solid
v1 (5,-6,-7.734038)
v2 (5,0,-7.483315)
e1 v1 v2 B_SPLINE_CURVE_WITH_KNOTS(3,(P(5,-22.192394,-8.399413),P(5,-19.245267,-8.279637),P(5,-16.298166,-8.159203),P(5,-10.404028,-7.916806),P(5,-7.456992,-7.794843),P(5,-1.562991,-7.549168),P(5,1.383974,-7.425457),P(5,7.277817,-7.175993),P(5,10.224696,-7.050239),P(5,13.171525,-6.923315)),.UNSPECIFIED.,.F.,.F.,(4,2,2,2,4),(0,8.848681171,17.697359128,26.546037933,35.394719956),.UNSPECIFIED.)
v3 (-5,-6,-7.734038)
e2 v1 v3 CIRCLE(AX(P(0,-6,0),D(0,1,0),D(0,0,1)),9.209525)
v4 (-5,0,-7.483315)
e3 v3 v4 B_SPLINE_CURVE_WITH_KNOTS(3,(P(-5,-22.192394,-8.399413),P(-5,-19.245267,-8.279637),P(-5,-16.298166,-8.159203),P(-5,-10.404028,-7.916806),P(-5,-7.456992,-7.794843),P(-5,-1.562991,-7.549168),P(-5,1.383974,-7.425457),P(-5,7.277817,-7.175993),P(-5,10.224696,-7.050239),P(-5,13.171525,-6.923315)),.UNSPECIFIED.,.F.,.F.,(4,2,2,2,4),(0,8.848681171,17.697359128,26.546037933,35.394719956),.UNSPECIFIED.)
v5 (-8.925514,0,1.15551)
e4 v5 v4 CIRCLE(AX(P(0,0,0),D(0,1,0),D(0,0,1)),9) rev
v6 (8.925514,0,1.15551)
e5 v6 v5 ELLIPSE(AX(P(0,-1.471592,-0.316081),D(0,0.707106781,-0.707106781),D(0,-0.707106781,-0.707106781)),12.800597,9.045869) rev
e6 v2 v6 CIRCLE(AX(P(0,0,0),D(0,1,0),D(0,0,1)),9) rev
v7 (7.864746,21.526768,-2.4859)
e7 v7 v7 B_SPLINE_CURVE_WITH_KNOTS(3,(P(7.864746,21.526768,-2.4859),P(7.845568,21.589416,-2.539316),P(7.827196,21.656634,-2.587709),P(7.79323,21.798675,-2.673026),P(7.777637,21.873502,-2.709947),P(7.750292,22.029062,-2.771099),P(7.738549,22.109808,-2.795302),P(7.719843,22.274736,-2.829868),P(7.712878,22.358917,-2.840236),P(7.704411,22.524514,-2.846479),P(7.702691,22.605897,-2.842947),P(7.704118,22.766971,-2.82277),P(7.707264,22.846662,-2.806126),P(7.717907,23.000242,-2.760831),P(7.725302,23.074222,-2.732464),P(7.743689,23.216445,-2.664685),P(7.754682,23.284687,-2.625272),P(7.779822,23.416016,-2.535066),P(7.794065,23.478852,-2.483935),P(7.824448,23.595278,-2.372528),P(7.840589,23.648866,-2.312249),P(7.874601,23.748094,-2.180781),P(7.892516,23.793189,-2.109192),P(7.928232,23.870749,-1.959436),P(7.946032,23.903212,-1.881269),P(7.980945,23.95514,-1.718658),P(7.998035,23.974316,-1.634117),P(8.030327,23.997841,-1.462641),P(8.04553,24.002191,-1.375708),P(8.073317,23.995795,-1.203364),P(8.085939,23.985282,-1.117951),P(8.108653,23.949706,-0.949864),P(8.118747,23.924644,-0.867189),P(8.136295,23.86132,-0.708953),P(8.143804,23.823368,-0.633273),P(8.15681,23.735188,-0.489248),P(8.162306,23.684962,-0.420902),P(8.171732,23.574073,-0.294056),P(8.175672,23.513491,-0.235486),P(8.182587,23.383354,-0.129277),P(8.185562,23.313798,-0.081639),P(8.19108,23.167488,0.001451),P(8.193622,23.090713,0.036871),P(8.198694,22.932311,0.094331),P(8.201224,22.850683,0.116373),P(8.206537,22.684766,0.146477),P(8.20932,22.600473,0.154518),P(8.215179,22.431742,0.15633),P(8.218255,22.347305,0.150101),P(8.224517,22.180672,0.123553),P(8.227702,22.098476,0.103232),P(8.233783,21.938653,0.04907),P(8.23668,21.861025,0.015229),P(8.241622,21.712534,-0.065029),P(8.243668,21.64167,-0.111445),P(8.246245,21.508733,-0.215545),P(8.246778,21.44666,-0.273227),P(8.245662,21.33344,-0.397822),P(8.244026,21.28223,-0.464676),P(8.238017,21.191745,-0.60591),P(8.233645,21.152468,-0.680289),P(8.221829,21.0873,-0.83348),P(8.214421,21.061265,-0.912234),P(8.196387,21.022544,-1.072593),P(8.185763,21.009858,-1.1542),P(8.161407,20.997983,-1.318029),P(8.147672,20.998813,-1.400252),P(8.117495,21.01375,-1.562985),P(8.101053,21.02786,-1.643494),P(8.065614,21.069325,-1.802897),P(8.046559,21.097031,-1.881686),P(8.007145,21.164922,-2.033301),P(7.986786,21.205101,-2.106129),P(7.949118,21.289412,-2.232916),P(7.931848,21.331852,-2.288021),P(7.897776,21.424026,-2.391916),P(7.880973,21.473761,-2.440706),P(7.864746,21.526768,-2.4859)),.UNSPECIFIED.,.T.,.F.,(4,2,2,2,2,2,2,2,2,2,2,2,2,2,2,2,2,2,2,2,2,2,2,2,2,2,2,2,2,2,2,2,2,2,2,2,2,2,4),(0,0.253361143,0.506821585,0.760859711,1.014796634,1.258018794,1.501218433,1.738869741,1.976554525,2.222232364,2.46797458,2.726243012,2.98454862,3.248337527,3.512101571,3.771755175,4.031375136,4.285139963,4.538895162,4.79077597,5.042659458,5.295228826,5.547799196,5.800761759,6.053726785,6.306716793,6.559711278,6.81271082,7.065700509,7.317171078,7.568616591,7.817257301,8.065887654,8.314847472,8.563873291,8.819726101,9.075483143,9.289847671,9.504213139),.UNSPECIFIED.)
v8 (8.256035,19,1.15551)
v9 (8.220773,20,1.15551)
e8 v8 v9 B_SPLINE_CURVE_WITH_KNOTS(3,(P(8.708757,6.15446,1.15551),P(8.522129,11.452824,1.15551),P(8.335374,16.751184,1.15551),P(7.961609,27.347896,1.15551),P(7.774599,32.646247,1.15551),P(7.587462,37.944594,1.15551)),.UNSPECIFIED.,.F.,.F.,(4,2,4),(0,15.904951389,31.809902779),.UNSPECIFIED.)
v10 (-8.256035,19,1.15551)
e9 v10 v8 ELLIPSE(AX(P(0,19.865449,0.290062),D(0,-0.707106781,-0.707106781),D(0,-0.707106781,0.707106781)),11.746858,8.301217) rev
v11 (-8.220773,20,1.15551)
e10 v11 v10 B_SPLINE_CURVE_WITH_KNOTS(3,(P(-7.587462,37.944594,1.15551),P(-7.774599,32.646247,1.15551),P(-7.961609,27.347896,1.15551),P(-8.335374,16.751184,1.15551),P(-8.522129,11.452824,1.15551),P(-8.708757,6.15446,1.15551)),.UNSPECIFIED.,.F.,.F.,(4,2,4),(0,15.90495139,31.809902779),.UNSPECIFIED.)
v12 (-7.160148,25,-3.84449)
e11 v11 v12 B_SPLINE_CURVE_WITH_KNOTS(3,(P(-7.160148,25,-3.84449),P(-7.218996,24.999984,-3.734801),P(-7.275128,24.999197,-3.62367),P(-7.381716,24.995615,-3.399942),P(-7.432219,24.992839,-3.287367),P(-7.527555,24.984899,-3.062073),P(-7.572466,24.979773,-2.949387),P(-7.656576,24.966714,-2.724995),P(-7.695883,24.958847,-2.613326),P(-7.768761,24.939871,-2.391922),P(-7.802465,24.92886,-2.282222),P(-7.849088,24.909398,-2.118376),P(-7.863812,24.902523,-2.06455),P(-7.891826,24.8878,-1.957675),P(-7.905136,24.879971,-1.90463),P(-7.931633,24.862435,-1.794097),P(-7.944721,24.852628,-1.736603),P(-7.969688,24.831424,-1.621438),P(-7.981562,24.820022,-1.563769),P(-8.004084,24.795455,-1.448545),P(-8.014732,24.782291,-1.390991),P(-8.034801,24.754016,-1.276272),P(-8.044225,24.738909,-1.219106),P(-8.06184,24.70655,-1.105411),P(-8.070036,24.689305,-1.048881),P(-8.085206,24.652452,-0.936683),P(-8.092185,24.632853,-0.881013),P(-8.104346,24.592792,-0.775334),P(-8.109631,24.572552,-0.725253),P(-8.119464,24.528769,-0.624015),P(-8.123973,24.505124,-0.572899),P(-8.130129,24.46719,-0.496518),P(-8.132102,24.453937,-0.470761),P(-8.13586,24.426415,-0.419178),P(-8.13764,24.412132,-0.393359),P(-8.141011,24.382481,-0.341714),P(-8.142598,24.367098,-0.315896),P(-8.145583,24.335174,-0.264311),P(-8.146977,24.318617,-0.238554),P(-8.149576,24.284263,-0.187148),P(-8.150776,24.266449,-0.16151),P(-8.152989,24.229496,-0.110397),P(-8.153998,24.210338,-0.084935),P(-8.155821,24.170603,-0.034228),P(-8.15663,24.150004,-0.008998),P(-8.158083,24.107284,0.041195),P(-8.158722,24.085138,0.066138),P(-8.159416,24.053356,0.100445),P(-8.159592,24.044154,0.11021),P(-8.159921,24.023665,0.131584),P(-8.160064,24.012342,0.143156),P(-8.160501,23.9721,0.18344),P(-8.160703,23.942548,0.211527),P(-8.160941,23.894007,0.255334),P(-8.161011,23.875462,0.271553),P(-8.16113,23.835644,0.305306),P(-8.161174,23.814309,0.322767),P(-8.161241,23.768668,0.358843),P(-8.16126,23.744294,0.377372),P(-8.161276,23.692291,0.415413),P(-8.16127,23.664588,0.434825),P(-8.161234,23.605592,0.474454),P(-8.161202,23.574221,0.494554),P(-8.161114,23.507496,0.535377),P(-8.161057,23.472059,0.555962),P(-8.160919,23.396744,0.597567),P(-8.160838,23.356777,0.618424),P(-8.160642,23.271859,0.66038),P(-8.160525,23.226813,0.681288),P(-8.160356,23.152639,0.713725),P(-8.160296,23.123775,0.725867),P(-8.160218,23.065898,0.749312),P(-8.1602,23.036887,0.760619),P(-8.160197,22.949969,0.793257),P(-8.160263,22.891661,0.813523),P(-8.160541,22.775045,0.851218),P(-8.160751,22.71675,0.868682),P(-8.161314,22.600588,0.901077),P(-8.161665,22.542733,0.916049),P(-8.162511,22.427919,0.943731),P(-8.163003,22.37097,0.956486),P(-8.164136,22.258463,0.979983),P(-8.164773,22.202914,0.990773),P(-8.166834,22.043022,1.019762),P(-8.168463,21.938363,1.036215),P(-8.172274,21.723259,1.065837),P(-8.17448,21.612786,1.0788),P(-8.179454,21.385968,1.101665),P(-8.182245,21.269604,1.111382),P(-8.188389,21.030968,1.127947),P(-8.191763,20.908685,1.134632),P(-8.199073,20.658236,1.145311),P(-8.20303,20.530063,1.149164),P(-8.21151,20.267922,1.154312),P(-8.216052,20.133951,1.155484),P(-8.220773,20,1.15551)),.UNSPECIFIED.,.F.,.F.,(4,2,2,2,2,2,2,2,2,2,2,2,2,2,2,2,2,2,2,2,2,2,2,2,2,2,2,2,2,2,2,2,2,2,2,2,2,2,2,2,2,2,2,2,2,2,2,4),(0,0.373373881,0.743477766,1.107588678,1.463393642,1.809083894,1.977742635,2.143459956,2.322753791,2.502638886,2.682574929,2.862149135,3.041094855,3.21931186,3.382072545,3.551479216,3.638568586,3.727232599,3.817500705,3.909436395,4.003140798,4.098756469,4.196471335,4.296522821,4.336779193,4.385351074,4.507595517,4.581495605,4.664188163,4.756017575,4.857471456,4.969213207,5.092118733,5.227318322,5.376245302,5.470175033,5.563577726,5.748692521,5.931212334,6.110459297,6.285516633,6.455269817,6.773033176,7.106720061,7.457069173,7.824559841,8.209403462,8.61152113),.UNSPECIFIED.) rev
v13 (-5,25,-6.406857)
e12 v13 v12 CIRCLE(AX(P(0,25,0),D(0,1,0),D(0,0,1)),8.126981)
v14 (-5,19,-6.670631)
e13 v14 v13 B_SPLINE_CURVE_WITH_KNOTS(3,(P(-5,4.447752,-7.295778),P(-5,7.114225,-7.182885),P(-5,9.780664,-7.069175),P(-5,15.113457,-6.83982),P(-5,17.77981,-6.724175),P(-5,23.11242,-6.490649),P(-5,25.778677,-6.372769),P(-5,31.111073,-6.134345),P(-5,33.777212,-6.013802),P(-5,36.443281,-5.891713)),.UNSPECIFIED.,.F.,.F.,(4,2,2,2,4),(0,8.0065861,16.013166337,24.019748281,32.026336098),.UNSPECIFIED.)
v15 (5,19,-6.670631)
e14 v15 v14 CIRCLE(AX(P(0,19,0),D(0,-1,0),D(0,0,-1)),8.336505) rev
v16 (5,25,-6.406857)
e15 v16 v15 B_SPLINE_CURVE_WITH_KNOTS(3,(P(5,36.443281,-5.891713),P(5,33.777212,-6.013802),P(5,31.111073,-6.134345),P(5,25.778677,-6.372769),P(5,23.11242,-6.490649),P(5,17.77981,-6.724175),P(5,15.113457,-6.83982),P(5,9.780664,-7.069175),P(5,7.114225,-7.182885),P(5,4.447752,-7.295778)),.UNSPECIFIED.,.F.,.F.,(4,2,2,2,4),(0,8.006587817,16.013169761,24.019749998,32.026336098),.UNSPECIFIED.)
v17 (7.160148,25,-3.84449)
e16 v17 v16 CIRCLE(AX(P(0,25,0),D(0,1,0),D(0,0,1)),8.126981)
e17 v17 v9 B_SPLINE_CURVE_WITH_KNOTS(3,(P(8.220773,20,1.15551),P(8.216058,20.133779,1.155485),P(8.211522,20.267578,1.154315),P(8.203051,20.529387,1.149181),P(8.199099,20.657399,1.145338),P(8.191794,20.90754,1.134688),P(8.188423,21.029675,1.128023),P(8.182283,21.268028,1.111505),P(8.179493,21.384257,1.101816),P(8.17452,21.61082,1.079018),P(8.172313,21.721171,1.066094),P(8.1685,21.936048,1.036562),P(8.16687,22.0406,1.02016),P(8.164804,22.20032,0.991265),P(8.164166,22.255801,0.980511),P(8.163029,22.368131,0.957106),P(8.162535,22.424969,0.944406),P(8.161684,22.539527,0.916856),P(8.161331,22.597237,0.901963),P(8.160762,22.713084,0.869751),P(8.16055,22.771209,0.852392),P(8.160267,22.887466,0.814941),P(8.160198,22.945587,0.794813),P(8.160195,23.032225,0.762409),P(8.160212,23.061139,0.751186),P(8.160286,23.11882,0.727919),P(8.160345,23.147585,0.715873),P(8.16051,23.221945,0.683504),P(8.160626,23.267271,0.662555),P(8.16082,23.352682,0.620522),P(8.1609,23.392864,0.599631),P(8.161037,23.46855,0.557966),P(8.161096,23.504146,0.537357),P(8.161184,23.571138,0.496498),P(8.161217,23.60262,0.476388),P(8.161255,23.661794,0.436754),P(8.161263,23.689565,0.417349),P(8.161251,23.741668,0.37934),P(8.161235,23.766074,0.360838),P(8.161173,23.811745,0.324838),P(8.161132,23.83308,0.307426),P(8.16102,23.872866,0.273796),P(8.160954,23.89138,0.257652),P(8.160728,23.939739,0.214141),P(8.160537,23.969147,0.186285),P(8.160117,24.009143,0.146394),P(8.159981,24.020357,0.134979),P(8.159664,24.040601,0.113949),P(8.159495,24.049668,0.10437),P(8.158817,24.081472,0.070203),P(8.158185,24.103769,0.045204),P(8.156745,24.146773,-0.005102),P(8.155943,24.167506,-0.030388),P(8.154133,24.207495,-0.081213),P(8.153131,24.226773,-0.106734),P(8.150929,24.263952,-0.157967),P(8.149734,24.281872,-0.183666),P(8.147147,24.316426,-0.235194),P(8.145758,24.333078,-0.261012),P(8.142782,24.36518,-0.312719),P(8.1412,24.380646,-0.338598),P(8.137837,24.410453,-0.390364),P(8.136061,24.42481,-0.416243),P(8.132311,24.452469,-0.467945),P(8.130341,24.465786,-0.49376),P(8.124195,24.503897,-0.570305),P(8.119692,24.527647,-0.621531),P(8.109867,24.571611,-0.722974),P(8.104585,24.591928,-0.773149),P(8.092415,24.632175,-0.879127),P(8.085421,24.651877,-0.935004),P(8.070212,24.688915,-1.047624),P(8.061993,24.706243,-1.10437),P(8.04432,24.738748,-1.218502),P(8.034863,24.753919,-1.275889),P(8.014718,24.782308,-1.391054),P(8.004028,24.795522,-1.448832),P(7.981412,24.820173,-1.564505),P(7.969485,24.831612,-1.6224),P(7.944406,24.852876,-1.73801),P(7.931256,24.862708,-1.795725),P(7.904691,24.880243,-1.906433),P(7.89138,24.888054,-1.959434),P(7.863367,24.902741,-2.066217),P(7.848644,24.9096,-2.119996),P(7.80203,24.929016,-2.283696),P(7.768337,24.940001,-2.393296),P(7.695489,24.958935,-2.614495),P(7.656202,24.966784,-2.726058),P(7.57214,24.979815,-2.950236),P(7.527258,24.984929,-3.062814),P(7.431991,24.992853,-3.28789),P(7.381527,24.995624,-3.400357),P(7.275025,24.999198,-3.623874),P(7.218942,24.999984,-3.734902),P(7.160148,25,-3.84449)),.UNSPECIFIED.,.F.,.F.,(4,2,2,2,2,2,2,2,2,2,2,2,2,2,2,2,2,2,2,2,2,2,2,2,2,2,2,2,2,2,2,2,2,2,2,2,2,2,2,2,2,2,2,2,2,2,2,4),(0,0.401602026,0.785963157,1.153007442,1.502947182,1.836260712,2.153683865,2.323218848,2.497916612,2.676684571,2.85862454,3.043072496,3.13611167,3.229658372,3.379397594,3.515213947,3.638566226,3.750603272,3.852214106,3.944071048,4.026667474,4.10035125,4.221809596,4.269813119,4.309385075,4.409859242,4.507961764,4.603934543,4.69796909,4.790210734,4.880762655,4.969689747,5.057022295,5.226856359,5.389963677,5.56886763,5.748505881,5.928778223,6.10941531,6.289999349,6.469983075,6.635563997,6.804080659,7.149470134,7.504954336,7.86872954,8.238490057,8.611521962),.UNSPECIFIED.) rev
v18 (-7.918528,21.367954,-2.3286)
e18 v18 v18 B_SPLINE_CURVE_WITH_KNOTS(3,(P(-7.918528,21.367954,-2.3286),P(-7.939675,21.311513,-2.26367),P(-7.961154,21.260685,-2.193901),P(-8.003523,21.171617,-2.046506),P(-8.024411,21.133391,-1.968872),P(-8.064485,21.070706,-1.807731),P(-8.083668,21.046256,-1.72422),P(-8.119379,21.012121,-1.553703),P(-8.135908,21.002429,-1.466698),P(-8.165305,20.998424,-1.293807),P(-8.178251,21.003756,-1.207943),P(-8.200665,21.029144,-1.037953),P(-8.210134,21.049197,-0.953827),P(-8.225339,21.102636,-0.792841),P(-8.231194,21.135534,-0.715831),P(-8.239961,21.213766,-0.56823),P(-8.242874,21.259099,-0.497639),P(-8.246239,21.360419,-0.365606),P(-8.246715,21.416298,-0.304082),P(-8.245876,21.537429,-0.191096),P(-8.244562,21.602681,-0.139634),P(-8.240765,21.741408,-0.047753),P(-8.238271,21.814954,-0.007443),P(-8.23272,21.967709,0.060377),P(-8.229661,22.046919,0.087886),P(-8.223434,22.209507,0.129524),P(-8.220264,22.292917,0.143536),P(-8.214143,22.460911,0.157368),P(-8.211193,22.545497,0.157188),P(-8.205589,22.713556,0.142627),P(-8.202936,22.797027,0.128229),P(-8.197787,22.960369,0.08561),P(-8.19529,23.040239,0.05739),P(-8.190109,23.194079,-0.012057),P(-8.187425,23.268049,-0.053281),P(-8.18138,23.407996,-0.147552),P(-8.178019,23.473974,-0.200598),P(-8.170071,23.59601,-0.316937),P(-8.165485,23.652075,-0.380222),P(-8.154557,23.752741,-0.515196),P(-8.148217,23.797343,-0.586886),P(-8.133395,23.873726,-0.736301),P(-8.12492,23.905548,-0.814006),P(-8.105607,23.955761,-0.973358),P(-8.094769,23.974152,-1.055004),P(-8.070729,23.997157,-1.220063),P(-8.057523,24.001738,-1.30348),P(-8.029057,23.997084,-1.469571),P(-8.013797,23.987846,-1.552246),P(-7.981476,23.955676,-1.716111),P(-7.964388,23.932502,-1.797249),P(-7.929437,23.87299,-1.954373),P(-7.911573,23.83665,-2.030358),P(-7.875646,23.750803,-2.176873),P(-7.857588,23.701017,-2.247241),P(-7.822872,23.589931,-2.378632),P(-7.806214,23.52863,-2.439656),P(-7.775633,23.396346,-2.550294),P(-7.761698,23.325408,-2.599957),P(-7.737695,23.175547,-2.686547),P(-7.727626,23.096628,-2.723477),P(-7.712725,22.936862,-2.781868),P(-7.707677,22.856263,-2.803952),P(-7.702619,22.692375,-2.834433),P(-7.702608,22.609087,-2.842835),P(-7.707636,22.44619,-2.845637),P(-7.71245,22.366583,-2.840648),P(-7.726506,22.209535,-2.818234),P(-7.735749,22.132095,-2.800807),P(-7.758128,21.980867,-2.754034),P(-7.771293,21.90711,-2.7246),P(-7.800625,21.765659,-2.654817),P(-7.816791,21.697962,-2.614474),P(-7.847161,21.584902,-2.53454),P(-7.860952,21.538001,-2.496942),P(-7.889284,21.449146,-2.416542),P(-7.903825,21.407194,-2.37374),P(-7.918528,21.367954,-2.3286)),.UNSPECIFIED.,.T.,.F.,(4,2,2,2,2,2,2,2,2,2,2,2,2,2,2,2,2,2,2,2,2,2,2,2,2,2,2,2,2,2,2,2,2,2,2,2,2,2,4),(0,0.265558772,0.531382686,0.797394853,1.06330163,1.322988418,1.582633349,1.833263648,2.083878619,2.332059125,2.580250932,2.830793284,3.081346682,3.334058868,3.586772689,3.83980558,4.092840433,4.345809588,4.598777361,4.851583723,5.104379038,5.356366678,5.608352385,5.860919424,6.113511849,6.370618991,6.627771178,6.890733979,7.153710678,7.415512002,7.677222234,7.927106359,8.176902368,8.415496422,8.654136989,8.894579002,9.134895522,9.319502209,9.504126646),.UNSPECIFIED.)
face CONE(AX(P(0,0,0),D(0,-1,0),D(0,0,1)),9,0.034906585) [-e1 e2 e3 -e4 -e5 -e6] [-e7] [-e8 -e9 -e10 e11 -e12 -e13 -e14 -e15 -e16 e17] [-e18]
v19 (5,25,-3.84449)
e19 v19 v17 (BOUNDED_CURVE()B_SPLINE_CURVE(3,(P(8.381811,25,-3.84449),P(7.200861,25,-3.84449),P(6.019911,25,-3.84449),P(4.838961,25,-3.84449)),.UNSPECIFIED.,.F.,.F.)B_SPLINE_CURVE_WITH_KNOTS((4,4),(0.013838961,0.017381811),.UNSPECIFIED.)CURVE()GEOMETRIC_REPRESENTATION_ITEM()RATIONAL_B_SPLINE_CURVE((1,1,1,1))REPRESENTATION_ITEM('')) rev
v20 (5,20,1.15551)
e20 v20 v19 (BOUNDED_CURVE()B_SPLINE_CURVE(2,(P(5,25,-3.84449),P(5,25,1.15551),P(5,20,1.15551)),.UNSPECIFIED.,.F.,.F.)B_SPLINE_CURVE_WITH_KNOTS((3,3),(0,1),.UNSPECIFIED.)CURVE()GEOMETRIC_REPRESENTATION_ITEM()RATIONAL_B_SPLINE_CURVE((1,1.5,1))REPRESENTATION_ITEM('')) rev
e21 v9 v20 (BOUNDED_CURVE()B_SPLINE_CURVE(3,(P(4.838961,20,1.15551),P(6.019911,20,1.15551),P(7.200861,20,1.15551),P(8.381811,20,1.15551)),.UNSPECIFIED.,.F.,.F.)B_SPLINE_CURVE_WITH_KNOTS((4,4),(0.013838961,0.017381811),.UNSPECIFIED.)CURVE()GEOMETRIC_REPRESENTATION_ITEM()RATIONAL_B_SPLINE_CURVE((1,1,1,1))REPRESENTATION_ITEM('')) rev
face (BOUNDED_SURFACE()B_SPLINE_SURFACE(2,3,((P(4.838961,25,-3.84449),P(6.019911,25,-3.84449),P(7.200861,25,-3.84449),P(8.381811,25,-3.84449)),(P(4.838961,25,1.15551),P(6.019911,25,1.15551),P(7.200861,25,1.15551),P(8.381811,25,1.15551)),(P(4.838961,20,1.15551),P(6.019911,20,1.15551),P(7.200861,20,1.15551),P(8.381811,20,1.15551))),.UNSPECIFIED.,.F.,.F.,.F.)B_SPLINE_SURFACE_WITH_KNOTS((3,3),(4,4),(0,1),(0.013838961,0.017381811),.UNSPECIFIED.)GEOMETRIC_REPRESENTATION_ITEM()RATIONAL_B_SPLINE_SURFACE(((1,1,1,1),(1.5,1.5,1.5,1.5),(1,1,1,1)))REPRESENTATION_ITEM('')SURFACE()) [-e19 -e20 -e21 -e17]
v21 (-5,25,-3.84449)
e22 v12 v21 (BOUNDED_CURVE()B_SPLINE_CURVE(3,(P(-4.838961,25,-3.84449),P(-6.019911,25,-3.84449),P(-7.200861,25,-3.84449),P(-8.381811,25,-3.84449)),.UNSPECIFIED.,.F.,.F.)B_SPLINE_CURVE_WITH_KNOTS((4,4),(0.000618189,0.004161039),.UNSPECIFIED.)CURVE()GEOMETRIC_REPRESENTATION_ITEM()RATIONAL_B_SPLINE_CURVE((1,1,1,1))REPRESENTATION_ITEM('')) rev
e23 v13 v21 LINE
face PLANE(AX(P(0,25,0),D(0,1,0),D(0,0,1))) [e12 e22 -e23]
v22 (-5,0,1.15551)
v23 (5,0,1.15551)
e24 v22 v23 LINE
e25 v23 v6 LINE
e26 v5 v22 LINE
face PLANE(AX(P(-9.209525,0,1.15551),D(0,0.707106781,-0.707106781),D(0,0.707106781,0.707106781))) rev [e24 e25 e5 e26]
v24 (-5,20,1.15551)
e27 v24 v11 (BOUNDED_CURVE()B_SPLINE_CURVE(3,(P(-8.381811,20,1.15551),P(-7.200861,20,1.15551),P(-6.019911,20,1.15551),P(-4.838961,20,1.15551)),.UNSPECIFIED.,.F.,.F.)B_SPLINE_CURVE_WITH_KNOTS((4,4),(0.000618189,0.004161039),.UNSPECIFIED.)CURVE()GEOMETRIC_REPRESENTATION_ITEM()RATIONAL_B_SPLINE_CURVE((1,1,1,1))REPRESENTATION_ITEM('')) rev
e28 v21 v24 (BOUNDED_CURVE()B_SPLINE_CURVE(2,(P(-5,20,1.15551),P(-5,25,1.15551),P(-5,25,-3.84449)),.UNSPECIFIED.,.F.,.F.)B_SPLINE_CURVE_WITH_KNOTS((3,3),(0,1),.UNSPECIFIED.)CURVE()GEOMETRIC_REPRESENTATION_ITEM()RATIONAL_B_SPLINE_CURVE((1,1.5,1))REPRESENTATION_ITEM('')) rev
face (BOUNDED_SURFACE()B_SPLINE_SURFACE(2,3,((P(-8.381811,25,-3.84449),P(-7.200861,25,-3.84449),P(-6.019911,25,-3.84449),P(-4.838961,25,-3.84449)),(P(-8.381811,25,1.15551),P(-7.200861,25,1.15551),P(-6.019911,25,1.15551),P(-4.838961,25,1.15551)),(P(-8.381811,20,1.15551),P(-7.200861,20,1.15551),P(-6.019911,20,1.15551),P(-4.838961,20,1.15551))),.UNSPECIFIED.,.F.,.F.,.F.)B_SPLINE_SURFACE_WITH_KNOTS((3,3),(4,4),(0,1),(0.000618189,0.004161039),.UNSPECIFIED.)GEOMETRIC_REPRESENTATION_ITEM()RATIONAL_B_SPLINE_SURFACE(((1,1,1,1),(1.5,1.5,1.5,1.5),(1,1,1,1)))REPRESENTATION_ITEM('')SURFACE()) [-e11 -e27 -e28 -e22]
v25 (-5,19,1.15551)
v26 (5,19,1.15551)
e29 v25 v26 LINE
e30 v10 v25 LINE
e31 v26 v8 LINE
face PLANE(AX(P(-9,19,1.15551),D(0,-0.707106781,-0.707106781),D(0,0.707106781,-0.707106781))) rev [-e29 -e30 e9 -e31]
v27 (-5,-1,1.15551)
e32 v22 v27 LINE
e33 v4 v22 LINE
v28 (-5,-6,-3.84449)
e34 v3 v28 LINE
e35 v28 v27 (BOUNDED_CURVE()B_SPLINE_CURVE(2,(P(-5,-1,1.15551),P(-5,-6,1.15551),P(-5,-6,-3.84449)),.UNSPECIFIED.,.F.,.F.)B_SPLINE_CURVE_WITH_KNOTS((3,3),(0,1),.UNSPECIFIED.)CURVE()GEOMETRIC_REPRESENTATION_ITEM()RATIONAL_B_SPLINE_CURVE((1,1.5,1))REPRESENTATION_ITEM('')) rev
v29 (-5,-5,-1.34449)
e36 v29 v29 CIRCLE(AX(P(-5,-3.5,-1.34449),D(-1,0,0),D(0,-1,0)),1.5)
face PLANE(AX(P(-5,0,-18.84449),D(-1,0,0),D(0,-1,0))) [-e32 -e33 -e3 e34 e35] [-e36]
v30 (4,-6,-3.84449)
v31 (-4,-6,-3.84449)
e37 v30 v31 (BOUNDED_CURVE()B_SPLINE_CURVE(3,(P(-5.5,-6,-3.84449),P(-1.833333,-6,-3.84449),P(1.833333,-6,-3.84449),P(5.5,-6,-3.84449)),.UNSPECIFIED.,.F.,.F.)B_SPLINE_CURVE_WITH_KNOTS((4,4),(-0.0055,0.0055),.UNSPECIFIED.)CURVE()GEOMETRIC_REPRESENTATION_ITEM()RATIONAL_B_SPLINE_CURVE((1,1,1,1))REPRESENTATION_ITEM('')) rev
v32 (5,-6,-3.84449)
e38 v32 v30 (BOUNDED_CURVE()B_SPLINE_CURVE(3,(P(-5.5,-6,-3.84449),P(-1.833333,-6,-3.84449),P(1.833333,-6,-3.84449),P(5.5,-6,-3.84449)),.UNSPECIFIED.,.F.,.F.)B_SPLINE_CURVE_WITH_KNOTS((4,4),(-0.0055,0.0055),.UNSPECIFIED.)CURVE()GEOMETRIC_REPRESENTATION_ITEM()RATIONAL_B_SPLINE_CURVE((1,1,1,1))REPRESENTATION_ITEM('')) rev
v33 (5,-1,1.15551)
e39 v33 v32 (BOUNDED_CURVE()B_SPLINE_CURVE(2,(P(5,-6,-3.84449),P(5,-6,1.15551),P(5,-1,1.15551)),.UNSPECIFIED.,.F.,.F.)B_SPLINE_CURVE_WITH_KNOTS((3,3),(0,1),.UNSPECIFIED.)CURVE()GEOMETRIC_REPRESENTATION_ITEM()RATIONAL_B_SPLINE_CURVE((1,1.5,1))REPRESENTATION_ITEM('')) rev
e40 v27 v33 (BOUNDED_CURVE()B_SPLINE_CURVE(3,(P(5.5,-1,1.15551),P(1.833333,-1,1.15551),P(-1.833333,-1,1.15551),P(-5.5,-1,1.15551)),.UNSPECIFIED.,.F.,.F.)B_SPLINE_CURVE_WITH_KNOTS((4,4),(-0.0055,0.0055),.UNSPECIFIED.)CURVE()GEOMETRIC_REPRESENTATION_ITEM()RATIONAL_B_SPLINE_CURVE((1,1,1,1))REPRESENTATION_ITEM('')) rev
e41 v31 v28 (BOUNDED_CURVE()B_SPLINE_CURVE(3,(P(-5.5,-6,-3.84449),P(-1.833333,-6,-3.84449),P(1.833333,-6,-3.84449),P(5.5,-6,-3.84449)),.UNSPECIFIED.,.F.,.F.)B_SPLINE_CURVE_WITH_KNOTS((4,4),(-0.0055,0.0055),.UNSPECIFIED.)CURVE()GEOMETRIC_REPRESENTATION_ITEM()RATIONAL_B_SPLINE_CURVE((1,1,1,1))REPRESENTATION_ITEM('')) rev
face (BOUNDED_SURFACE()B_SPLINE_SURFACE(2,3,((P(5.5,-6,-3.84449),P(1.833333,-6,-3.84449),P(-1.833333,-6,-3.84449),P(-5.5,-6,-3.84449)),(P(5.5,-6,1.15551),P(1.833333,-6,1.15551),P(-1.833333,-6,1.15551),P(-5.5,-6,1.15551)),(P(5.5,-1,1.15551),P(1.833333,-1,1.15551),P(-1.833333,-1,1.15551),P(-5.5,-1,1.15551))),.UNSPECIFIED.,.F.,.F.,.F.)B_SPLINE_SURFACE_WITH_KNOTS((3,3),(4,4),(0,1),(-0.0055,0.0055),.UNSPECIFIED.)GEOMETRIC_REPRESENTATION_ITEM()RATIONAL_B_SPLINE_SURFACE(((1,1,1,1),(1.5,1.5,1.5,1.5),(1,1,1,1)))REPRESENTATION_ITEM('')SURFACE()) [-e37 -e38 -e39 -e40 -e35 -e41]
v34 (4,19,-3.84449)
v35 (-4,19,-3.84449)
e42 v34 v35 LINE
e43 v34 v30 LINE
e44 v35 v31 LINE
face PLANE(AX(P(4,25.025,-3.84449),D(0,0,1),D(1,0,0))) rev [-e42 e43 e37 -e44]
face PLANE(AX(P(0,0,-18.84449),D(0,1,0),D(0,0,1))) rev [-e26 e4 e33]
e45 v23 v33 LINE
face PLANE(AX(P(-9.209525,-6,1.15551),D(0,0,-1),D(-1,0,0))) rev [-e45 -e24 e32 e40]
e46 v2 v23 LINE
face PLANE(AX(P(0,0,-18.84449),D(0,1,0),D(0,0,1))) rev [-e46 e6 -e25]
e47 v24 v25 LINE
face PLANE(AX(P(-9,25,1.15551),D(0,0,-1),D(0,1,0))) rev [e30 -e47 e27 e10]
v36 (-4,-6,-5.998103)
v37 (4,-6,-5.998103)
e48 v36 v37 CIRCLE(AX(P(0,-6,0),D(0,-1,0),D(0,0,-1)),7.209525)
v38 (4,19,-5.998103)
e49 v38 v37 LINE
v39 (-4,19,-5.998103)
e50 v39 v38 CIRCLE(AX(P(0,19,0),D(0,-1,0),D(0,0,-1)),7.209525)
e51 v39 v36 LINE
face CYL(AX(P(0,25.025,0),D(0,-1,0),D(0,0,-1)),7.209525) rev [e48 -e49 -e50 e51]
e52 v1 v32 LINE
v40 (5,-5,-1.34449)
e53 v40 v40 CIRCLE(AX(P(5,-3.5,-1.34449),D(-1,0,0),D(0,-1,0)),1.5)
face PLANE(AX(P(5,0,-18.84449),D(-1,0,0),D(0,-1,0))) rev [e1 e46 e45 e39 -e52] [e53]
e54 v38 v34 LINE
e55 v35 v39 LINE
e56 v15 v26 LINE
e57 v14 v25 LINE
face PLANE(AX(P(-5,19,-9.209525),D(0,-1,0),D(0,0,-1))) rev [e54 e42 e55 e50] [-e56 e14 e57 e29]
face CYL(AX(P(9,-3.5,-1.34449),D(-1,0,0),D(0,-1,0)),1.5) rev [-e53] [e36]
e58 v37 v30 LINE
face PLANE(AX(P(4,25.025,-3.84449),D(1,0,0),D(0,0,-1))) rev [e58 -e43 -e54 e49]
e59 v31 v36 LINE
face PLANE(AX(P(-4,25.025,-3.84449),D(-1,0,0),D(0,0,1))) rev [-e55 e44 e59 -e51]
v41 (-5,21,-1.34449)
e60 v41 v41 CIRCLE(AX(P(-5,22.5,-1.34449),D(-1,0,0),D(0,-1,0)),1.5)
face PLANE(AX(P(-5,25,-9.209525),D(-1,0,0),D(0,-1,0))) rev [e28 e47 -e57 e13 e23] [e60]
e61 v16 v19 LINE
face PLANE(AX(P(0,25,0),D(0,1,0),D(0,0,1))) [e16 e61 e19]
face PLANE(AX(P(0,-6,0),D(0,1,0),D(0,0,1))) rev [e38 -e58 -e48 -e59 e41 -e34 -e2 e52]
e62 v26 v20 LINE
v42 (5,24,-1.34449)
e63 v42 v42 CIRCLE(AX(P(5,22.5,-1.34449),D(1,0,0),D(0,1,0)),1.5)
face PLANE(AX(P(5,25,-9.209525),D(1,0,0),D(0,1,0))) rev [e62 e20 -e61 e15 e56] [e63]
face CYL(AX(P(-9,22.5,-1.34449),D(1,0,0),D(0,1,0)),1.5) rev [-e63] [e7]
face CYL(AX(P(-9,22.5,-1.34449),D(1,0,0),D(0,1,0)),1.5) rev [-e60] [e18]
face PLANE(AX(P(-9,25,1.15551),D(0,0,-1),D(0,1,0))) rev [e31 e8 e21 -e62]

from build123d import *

# Parameters (mm, degrees)
SKETCH1_R                     = 9
BOSS_EXTRUDE1_DEPTH           = 25
BOSS_EXTRUDE1_TAPER           = 2
BOSS_EXTRUDE1_OTHER_WAY_DEPTH = 6
BOSS_EXTRUDE1_OTHER_WAY_TAPER = -2
CUT_EXTRUDE1_DEPTH            = 29.189194514
CUT_EXTRUDE1_DEPTH_BACK       = 29.189194514
CUT_EXTRUDE2_START            = -10.365035118
CUT_EXTRUDE2_OUTLINE_W        = 9.770566763
CUT_EXTRUDE2_OUTLINE_H        = 6
CUT_EXTRUDE2_DEPTH            = 10.365035118
CUT_EXTRUDE3_DEPTH            = 31.096766332
CUT_EXTRUDE3_DEPTH_BACK       = 31.096766332
SKETCH5_R                     = 1.5
FILLET1_SIZE                  = 5
CUT_EXTRUDE4_DEPTH            = 29.121439218
CUT_EXTRUDE4_DEPTH_BACK       = 29.121439218
SKETCH8_W                     = 10
SKETCH8_H                     = 6
CUT_EXTRUDE5_DEPTH            = 29.520763505
CUT_EXTRUDE6_DEPTH            = 31.096766332
CUT_EXTRUDE6_DEPTH_BACK       = 31.096766332
SKETCH9_R                     = 1.5
FILLET2_SIZE                  = 5
CUT_EXTRUDE7_DEPTH            = 34.568070447


with BuildPart() as part:
    # Sketch1 → Boss-Extrude1 (new body)
    with BuildSketch(Plane(origin=(0, 0, 0), x_dir=(1, 0, 0), z_dir=(0, 1, 0))):
        Circle(SKETCH1_R)
    extrude(amount=BOSS_EXTRUDE1_DEPTH, taper=BOSS_EXTRUDE1_TAPER)

    # Sketch1 → Boss-Extrude1 other way (add)
    with BuildSketch(Plane(origin=(0, 0, 0), x_dir=(1, 0, 0), z_dir=(0, 1, 0))):
        Circle(SKETCH1_R)
    extrude(amount=-BOSS_EXTRUDE1_OTHER_WAY_DEPTH, taper=BOSS_EXTRUDE1_OTHER_WAY_TAPER)

    # Sketch3 → Cut-Extrude1 (cut, two sides: drawn at the far end of the back side and taken through both)
    with BuildSketch(Plane(origin=(0, 0, 0), x_dir=(0, 0, -1), z_dir=(1, 0, 0)).offset(-CUT_EXTRUDE1_DEPTH_BACK)):
        Polygon((-1.155510401, -6), (-1.155510401, 0), (-11.155510401, 10), (-11.155510401, -6), align=None)
    extrude(amount=CUT_EXTRUDE1_DEPTH + CUT_EXTRUDE1_DEPTH_BACK, mode=Mode.SUBTRACT)

    # Cut-Extrude2: read off the stored shape, not the designer's step
    # Cut-Extrude2 outline → Cut-Extrude2 (cut)
    with BuildSketch(Plane.XY.offset(1.155510401).offset(CUT_EXTRUDE2_START)):
        with Locations((-9.885283382, -3)):
            Rectangle(CUT_EXTRUDE2_OUTLINE_W, CUT_EXTRUDE2_OUTLINE_H)
        with Locations((9.885283382, -3)):
            Rectangle(CUT_EXTRUDE2_OUTLINE_W, CUT_EXTRUDE2_OUTLINE_H)
    extrude(amount=CUT_EXTRUDE2_DEPTH, mode=Mode.SUBTRACT)

    # Sketch5 → Cut-Extrude3 (cut, two sides: drawn at the far end of the back side and taken through both)
    with BuildSketch(Plane.ZY.offset(5).offset(-CUT_EXTRUDE3_DEPTH_BACK)):
        with Locations(Location((-1.344489599, -3.5, 0), (0, 0, 270))):
            Circle(SKETCH5_R)
    extrude(amount=CUT_EXTRUDE3_DEPTH + CUT_EXTRUDE3_DEPTH_BACK, mode=Mode.SUBTRACT)

    # Fillet1
    # a fillet whose section is not a circle: 5 mm, written as the material it takes off along each edge
    with BuildSketch(Plane(origin=(17.5, -6, 1.155510401), x_dir=(0, 0, -1), z_dir=(-1, 0, 0))) as fillet1_piece_1:
        with BuildLine():
            Bezier((FILLET1_SIZE, 0), (0, 0), (0, -FILLET1_SIZE), weights=[1, 1.5, 1])
            Line((0, -FILLET1_SIZE), (0, 0))
            Line((0, 0), (FILLET1_SIZE, 0))
        make_face()
    extrude(amount=35, mode=Mode.SUBTRACT)

    # Sketch7 → Cut-Extrude4 (cut, two sides: drawn at the far end of the back side and taken through both)
    with BuildSketch(Plane(origin=(0, 0, 0), x_dir=(0, 0, -1), z_dir=(1, 0, 0)).offset(-CUT_EXTRUDE4_DEPTH_BACK)):
        Polygon((-1.155510401, 25), (-1.155510401, 19), (-12.24506556, 7.91044484), (-12.24506556, 25), align=None)
    extrude(amount=CUT_EXTRUDE4_DEPTH + CUT_EXTRUDE4_DEPTH_BACK, mode=Mode.SUBTRACT)

    # Sketch8 → Cut-Extrude5 (cut, through all)
    with BuildSketch(Plane.XY.offset(1.155510401)):
        with Locations((0, 22)):
            Rectangle(SKETCH8_W, SKETCH8_H)
    extrude(amount=-CUT_EXTRUDE5_DEPTH, mode=Mode.SUBTRACT)

    # Sketch9 → Cut-Extrude6 (cut, two sides: drawn at the far end of the back side and taken through both)
    with BuildSketch(Plane(origin=(-5, 0, 0), x_dir=(0, 0, -1), z_dir=(1, 0, 0)).offset(-CUT_EXTRUDE6_DEPTH_BACK)):
        with Locations(Location((1.344489599, 22.5, 0), (0, 0, 311.001081294))):
            Circle(SKETCH9_R)
    extrude(amount=CUT_EXTRUDE6_DEPTH + CUT_EXTRUDE6_DEPTH_BACK, mode=Mode.SUBTRACT)

    # Fillet2
    # a fillet whose section is not a circle: 5 mm, written as the material it takes off along each edge
    with BuildSketch(Plane(origin=(-20.544414959, 25, 1.155510401), x_dir=(0, 0, -1), z_dir=(1, 0, 0))) as fillet2_piece_1:
        with BuildLine():
            Bezier((FILLET2_SIZE, 0), (0, 0), (0, -FILLET2_SIZE), weights=[1, 1.5, 1])
            Line((0, -FILLET2_SIZE), (0, 0))
            Line((0, 0), (FILLET2_SIZE, 0))
        make_face()
    extrude(amount=28.044414959, mode=Mode.SUBTRACT)
    with BuildSketch(Plane(origin=(-7.5, 25, 1.155510401), x_dir=(0, -1, 0), z_dir=(1, 0, 0))) as fillet2_piece_2:
        with BuildLine():
            Bezier((FILLET2_SIZE, 0), (0, 0), (0, FILLET2_SIZE), weights=[1, 1.5, 1])
            Line((0, FILLET2_SIZE), (0, 0))
            Line((0, 0), (FILLET2_SIZE, 0))
        make_face()
    extrude(amount=28.044414959, mode=Mode.SUBTRACT)

    # Sketch10 → Cut-Extrude7 (cut, through all)
    with BuildSketch(Plane.XZ.offset(6)):
        with BuildLine():
            Line((-4, -3.844489599), (-4, -5.998103467))
            ThreePointArc((-4, -5.998103467), (0, -7.209524617), (4, -5.998103467))
            Line((4, -5.998103467), (4, -3.844489599))
            Line((4, -3.844489599), (-4, -3.844489599))
        make_face()
    extrude(amount=-CUT_EXTRUDE7_DEPTH, mode=Mode.SUBTRACT)


solid = part.part
